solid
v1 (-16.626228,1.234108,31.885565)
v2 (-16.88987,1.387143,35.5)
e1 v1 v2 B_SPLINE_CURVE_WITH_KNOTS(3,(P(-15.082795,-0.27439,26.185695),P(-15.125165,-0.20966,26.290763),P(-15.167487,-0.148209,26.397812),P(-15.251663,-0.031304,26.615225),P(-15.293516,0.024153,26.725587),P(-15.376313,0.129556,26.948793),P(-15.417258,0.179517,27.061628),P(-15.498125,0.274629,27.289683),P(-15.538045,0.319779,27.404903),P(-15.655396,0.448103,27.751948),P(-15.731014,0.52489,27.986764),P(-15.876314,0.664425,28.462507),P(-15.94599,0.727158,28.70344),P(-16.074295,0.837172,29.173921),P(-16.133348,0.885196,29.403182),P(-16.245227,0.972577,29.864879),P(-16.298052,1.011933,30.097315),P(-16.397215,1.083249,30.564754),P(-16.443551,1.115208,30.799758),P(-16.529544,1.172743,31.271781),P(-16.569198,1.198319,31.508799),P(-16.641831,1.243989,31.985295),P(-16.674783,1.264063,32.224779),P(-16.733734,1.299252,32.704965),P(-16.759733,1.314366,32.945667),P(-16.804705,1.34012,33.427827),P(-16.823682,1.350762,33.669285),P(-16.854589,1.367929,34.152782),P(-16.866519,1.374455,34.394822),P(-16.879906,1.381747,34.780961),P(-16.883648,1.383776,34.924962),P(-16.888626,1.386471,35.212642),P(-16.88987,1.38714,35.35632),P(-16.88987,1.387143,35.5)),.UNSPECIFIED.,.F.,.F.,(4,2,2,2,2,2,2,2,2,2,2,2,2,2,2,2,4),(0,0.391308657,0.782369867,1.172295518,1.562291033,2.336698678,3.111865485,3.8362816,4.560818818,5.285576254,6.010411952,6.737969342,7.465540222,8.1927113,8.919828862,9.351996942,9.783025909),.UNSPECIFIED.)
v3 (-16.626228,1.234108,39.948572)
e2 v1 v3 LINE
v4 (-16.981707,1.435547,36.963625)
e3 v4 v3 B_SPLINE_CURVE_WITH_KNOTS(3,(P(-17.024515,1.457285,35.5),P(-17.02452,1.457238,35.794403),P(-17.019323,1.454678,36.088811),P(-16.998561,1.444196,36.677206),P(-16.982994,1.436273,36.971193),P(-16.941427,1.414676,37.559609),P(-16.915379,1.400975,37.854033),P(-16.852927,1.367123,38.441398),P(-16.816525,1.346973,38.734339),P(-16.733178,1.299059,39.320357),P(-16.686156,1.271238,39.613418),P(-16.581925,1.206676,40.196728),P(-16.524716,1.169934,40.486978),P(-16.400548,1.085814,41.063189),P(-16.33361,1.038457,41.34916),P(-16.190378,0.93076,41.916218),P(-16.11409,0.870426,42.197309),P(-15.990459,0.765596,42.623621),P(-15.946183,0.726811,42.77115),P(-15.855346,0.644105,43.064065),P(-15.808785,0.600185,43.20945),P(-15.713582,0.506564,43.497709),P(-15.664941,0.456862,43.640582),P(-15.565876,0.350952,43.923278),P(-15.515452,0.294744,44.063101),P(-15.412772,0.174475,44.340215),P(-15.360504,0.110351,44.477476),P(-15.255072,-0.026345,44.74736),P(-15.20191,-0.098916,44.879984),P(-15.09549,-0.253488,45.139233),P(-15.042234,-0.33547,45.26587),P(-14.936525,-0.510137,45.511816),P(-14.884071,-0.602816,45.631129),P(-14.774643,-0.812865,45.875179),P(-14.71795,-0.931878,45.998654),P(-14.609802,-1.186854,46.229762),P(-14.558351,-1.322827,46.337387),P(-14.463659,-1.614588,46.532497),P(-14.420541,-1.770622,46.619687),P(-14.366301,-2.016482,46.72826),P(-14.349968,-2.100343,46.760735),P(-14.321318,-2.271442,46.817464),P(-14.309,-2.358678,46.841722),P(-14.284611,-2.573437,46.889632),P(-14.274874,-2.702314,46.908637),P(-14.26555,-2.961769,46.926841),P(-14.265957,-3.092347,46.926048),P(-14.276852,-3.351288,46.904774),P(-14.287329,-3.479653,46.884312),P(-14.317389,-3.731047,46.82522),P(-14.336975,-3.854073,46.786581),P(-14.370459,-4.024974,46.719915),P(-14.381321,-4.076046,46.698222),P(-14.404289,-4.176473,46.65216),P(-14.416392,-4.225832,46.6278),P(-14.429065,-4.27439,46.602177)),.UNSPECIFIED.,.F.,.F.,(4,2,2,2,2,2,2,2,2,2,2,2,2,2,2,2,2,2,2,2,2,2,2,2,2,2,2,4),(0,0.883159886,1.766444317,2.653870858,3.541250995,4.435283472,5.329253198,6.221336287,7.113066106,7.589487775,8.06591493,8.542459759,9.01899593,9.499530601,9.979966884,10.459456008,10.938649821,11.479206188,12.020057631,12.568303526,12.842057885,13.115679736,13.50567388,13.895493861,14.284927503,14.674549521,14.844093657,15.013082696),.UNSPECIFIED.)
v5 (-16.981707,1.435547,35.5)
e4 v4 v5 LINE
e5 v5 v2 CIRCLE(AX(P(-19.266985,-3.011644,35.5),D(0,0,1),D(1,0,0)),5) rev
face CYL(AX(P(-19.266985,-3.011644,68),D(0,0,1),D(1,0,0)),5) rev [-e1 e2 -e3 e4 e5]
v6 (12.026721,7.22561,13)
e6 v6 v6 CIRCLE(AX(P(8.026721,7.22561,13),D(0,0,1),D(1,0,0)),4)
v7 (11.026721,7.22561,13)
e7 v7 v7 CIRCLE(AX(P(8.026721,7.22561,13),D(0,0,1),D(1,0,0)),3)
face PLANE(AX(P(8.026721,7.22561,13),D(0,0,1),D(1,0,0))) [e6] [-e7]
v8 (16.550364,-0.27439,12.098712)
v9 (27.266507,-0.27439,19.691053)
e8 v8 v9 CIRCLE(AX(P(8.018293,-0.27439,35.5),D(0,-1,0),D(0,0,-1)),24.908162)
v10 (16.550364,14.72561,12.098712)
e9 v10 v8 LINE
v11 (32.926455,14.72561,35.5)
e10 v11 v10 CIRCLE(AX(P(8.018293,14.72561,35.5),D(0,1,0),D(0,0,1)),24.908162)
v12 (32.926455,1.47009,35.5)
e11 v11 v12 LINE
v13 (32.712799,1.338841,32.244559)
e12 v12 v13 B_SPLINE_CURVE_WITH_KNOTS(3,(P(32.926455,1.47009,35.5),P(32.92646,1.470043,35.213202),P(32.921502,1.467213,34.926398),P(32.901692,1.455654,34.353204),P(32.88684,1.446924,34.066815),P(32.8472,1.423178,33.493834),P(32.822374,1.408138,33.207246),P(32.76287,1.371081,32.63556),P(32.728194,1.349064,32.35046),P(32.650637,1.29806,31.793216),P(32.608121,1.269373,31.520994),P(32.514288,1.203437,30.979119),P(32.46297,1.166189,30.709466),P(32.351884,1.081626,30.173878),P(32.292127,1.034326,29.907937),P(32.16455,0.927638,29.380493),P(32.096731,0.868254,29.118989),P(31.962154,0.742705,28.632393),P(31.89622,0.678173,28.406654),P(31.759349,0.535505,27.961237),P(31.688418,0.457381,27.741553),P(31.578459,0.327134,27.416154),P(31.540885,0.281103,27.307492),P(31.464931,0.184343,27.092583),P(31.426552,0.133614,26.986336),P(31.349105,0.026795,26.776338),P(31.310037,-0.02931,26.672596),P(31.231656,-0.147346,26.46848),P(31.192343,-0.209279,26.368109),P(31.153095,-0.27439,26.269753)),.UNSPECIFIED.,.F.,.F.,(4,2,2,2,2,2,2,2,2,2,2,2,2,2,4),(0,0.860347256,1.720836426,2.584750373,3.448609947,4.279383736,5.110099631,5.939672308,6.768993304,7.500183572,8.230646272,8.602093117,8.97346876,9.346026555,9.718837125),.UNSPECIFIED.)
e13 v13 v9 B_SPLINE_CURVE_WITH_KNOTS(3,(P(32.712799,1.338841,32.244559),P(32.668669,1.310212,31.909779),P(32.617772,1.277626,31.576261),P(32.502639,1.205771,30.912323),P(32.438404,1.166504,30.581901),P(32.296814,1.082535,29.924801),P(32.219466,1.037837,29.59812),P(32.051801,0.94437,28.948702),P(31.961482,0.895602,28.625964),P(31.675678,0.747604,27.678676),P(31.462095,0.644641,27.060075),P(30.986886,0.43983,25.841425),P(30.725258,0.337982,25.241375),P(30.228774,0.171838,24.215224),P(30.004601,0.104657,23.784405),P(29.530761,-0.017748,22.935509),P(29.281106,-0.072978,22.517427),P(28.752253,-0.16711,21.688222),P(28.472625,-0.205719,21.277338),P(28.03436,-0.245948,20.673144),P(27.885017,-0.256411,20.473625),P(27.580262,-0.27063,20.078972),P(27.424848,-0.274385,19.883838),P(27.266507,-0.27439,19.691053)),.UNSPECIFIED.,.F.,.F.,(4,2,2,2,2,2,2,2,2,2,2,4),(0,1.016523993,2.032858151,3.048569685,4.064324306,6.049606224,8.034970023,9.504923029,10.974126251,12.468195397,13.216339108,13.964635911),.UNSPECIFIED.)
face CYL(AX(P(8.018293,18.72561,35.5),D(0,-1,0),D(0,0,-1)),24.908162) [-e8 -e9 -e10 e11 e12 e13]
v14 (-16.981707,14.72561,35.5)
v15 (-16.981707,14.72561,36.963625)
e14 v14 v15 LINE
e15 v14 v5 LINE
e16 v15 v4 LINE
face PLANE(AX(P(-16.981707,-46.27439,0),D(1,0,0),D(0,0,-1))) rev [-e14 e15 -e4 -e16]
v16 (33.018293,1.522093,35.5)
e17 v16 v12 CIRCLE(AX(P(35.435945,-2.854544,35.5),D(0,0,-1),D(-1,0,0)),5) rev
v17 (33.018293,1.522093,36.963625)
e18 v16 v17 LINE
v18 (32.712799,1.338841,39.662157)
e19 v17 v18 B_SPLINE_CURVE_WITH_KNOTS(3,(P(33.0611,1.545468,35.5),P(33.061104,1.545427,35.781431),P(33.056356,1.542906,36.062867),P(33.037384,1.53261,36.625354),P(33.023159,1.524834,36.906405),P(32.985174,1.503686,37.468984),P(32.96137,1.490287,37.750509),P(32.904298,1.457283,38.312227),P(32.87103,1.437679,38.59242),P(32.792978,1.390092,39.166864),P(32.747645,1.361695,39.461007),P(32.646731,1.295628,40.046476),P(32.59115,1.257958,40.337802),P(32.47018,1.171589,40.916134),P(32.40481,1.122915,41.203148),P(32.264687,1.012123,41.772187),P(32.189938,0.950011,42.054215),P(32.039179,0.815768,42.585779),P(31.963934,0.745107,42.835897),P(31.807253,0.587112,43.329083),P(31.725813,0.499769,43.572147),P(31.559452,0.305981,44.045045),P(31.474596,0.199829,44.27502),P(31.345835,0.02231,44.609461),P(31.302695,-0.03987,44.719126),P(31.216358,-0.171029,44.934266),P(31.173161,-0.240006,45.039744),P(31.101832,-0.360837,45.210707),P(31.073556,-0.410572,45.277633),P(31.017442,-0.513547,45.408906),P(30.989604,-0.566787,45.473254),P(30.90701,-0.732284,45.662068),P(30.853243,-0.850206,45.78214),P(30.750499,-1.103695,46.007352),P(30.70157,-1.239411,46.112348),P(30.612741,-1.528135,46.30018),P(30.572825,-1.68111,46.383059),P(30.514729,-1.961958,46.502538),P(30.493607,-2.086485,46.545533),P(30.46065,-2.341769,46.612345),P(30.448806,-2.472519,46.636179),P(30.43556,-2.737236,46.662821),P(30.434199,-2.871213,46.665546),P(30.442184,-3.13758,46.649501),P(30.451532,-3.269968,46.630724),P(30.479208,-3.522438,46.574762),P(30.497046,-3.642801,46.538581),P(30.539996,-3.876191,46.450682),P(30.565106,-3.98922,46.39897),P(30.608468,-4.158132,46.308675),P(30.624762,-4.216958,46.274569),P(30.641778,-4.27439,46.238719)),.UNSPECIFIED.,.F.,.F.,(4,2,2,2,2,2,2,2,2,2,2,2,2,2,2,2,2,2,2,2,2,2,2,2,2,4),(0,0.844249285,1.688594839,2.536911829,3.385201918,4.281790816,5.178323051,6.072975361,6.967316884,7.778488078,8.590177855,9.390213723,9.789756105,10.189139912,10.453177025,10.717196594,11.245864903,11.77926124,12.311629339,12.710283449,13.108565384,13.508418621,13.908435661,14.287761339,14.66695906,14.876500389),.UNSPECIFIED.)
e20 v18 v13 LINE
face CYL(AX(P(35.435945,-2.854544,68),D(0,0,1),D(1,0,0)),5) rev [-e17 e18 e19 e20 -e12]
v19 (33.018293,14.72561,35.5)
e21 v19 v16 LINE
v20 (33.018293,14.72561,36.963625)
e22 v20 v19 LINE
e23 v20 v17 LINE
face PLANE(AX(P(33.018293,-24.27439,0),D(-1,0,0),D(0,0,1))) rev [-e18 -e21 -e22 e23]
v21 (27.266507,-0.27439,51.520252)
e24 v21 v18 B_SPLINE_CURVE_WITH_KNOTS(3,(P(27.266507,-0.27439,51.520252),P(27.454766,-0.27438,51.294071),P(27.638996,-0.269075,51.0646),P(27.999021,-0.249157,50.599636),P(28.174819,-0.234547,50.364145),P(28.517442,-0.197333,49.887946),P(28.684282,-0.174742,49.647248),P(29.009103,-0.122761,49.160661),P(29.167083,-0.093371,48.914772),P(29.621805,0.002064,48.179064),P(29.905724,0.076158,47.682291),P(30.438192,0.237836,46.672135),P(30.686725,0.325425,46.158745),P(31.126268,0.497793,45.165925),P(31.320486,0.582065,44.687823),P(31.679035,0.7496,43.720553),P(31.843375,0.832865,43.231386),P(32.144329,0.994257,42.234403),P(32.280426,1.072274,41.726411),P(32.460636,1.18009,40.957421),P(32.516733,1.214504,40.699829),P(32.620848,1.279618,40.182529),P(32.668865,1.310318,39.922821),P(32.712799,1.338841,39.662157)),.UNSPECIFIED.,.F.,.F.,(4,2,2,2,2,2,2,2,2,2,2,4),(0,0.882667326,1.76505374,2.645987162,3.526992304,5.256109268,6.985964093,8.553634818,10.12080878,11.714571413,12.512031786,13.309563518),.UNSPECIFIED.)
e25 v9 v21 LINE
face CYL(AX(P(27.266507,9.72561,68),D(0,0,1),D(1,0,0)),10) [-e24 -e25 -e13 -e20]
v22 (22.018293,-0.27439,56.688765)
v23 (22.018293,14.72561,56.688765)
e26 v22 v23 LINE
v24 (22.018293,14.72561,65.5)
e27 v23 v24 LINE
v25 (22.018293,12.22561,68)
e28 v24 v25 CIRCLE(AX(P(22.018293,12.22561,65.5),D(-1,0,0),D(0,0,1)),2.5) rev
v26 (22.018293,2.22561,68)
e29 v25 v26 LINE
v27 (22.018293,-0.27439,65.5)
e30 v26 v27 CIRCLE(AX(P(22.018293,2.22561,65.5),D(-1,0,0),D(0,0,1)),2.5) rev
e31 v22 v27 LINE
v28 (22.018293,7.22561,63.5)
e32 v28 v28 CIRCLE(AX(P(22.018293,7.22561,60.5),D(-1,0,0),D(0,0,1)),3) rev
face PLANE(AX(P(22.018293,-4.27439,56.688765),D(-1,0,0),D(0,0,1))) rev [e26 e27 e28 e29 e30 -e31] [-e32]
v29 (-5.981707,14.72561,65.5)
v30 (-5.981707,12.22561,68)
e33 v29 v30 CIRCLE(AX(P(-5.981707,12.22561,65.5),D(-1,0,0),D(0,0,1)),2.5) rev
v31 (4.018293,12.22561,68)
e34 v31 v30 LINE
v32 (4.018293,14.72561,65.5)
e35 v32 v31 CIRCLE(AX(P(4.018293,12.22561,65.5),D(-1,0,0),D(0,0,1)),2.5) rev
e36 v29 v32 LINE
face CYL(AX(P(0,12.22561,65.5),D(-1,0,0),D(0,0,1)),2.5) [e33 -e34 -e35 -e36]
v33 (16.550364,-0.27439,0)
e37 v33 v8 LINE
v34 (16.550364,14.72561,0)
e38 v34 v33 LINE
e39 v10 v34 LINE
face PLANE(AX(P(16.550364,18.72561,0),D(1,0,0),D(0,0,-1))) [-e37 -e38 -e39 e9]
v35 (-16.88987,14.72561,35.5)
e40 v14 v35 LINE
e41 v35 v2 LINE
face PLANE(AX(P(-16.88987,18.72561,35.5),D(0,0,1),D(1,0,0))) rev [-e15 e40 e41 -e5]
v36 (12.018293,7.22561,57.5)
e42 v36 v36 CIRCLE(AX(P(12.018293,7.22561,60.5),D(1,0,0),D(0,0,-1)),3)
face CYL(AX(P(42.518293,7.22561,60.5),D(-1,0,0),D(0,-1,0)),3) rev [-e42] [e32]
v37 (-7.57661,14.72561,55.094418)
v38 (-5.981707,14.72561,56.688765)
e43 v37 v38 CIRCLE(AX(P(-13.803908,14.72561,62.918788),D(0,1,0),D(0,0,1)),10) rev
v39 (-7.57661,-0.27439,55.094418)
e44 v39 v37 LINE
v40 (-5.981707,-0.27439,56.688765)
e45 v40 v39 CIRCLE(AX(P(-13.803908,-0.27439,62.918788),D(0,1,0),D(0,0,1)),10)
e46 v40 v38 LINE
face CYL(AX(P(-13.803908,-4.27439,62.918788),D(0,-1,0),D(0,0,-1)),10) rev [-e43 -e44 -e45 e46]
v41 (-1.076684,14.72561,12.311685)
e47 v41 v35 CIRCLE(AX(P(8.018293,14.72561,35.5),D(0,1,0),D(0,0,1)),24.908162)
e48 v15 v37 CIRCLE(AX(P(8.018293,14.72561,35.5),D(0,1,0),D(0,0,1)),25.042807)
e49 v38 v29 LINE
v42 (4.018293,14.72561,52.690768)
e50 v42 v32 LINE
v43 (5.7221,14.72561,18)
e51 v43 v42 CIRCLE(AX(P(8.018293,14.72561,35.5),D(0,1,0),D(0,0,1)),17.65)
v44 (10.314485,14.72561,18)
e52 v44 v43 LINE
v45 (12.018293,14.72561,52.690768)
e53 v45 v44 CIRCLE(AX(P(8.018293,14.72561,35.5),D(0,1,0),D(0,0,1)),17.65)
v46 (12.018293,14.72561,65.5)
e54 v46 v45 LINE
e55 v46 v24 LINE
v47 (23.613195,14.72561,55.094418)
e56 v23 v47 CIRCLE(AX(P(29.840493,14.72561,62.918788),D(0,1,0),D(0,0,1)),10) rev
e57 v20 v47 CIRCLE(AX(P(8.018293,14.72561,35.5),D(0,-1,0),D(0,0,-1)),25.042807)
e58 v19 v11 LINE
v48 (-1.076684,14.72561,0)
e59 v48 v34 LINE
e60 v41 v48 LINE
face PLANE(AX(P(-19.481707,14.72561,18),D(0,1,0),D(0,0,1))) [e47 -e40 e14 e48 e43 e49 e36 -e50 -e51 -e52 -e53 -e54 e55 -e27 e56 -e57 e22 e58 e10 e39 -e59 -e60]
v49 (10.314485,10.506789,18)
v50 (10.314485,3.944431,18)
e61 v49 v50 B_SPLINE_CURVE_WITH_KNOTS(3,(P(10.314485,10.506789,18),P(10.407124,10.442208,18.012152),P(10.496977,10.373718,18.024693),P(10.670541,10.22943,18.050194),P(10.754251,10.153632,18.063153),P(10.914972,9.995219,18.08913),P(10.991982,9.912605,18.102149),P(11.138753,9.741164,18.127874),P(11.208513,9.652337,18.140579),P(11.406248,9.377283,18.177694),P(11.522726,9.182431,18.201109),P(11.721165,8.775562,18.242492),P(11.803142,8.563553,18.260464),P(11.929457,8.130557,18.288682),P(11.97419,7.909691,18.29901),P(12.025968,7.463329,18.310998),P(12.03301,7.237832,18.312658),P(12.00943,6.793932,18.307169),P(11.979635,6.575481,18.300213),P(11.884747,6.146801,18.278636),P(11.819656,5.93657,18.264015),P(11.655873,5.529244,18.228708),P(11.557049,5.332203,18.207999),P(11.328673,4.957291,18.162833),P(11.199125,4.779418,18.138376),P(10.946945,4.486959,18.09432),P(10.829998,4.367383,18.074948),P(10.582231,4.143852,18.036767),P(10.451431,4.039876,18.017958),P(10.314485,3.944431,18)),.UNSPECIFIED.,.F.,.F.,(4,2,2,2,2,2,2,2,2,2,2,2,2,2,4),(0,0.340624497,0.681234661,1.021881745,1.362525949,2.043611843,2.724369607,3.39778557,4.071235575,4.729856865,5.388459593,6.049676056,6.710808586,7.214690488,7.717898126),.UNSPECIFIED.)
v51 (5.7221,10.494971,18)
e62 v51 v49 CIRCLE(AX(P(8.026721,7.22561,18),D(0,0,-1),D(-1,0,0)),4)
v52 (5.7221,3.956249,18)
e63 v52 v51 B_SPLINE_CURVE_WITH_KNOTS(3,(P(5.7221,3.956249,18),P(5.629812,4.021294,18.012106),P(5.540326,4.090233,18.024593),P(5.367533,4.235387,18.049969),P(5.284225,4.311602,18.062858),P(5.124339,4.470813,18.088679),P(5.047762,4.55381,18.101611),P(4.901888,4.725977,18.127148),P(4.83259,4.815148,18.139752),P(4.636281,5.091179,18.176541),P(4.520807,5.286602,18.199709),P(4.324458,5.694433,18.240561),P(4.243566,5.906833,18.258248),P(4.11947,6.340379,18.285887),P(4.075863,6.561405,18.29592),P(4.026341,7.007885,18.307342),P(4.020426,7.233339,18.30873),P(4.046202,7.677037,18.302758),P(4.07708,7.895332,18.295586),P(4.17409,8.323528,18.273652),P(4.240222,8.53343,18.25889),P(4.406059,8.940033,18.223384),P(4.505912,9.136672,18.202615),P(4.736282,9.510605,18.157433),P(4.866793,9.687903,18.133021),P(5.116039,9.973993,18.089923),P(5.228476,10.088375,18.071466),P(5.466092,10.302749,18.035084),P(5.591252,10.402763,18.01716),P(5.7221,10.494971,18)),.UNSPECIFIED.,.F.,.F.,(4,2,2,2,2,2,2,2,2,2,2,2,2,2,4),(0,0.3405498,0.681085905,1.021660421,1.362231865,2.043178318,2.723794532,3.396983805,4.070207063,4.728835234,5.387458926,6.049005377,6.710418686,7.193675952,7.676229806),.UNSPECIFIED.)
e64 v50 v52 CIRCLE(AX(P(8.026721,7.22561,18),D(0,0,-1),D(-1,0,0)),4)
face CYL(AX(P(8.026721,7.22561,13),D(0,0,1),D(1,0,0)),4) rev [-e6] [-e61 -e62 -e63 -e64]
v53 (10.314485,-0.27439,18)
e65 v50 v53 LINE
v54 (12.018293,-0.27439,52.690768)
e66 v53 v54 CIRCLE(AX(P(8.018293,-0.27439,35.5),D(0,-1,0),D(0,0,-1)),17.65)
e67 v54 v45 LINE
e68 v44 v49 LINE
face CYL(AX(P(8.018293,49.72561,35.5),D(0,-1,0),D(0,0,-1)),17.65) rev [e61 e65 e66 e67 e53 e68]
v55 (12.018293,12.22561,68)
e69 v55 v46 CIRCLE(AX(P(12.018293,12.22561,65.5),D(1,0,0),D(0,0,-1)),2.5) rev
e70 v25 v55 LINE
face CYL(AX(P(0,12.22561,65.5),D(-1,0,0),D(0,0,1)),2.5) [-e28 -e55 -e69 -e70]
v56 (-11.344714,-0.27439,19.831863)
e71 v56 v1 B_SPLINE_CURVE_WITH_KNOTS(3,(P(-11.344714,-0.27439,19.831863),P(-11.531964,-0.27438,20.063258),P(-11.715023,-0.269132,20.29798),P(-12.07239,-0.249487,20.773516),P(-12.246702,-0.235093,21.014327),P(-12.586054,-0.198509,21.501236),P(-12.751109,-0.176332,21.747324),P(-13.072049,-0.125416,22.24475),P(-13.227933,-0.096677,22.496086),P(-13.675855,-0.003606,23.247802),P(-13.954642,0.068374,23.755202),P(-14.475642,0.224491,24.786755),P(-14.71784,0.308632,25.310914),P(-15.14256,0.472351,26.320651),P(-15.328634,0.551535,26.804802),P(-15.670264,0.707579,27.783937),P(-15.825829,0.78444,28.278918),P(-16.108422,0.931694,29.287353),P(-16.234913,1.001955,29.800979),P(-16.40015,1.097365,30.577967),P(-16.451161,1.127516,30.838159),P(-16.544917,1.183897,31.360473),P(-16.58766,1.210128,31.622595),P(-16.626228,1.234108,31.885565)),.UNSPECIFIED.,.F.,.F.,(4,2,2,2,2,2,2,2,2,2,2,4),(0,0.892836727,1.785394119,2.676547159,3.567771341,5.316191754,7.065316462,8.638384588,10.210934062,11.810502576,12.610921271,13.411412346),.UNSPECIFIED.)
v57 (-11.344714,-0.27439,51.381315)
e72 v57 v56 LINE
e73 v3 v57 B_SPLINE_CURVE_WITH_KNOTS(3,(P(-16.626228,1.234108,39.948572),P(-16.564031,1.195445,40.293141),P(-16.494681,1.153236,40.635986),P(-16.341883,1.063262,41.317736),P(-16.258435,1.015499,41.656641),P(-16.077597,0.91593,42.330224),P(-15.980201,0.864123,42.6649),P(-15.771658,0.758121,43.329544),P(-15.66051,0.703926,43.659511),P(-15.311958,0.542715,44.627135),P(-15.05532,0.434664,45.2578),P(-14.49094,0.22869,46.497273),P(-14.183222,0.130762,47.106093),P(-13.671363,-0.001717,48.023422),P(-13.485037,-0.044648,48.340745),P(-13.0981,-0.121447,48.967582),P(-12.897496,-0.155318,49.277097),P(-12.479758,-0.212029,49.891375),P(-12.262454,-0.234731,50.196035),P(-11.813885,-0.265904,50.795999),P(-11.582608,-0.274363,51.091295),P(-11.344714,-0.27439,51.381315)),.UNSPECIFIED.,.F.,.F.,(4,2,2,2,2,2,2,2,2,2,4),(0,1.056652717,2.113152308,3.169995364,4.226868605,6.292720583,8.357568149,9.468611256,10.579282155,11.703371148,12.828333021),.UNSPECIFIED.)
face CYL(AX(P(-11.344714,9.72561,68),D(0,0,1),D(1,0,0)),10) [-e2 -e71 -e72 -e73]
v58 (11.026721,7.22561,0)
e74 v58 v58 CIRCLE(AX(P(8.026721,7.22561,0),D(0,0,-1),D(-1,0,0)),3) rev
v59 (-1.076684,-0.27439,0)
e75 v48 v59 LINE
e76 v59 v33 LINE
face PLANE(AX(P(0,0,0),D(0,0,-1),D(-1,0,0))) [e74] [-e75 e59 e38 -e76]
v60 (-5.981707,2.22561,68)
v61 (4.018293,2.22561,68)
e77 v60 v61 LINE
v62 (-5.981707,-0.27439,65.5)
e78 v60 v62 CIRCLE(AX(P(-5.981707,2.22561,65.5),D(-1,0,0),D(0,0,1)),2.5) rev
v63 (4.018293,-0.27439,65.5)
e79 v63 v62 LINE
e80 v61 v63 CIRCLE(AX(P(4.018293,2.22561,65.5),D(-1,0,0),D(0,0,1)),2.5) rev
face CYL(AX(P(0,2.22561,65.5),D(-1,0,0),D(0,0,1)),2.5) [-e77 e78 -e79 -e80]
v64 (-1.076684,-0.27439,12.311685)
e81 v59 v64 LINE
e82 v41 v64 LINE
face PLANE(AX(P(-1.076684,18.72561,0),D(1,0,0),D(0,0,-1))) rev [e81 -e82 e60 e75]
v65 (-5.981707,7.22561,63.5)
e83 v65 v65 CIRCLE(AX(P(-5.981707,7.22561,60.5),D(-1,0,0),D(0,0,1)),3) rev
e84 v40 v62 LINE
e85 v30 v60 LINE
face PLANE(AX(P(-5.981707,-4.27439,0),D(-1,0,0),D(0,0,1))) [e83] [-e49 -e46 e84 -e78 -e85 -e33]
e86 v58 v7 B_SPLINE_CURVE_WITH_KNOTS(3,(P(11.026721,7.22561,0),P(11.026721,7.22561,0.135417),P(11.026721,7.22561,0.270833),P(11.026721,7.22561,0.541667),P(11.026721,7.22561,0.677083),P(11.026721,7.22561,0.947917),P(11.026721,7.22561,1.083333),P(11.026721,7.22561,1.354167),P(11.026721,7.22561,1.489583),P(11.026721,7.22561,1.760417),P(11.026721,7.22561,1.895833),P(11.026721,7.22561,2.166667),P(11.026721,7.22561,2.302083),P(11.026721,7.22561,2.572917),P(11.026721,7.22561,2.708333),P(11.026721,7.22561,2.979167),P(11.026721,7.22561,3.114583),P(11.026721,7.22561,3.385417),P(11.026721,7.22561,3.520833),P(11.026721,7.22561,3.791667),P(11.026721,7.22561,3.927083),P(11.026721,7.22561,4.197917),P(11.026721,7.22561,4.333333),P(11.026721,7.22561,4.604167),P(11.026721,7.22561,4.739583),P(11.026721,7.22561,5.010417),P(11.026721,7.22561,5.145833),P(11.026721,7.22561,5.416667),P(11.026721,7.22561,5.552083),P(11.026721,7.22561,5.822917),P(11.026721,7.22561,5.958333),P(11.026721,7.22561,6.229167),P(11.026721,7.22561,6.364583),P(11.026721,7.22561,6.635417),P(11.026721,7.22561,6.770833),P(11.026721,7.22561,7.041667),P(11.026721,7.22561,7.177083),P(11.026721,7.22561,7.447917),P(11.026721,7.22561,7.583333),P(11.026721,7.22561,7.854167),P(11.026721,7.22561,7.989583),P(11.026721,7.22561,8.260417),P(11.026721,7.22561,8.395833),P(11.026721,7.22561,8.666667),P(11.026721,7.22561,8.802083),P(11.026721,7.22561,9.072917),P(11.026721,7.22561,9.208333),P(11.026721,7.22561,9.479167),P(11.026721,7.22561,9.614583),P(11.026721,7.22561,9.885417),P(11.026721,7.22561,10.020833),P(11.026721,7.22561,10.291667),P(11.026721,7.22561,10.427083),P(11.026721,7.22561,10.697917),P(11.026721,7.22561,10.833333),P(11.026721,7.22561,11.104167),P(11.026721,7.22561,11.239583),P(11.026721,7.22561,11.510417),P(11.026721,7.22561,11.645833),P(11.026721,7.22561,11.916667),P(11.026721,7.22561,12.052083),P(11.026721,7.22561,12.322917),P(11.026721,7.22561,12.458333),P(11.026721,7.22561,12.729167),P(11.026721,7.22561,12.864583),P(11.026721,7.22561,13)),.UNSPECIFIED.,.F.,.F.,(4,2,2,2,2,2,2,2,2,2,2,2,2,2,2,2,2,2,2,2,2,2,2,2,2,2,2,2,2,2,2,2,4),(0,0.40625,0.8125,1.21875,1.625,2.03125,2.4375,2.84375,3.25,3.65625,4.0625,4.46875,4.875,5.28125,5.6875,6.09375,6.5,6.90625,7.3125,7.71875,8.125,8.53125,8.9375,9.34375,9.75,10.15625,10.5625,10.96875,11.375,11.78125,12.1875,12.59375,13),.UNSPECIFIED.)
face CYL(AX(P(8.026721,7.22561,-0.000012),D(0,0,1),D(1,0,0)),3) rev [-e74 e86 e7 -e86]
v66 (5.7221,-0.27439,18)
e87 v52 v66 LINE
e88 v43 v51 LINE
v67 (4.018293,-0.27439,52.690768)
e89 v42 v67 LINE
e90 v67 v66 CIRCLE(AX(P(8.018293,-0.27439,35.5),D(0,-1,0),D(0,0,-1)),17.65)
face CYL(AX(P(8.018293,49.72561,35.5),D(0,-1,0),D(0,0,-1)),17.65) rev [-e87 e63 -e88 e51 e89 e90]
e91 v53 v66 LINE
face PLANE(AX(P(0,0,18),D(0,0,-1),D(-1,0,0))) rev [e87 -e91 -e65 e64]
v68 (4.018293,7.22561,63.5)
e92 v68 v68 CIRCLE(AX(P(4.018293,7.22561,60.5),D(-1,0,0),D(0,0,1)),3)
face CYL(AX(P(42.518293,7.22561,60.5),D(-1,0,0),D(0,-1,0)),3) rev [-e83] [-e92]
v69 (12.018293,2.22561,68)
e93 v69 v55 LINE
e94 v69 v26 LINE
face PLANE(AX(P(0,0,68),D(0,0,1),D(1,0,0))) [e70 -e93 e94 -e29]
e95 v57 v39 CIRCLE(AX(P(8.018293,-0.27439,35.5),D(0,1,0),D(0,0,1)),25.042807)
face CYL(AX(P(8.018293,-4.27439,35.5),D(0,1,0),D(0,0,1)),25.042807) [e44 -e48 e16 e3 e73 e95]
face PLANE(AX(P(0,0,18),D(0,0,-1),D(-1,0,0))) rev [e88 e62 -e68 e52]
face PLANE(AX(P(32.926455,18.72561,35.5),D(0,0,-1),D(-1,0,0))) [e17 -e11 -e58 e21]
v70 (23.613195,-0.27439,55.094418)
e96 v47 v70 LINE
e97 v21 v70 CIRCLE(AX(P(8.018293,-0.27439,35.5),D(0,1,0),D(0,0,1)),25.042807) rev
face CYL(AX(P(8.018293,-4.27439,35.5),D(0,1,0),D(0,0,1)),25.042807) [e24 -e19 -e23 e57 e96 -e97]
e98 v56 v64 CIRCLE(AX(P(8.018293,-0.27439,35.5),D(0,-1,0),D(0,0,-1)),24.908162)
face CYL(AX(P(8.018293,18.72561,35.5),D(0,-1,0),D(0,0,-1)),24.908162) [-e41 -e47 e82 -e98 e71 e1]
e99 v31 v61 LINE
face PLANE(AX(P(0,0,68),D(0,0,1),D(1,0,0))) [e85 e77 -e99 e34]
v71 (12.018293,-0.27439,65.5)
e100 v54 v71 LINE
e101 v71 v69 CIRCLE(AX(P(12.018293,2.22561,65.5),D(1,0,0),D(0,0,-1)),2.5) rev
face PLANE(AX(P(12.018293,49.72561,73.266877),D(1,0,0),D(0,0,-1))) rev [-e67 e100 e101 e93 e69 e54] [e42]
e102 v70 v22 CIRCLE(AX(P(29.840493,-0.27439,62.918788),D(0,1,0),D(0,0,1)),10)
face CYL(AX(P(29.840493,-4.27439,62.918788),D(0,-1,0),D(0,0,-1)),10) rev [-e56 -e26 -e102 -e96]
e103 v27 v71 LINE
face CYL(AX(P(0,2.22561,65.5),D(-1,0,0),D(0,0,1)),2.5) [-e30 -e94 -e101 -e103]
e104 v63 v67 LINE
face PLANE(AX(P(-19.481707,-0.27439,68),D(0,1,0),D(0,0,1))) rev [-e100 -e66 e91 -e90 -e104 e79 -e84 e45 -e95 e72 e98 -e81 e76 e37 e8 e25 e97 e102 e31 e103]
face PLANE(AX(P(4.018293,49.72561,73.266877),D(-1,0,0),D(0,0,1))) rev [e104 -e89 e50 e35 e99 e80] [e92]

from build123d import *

# Parameters (mm, degrees)
SKETCH1_W                = 55
SKETCH1_H                = 40
BOSS_EXTRUDE1_DEPTH      = 18
SKETCH2_W                = 55
SKETCH2_H                = 15
BOSS_EXTRUDE2_DEPTH      = 50
CUT_EXTRUDE1_START       = -15
CUT_EXTRUDE1_DEPTH       = 15
SKETCH4_W                = 8
SKETCH4_H                = 40.233753348
CUT_EXTRUDE2_DEPTH       = 50
SKETCH6_R                = 3
CUT_EXTRUDE3_DEPTH       = 62
FILLET1_R                = 2.5
CUT_EXTRUDE6_DEPTH       = 67.335088131
CUT_EXTRUDE6_DEPTH_BACK  = 67.335088131
CUT_EXTRUDE7_DEPTH       = 61
CUT_EXTRUDE8_DEPTH       = 39
FILLET2_R                = 20
CUT_EXTRUDE9_DEPTH       = 80.705724129
CUT_EXTRUDE9_DEPTH_BACK  = 80.705724129
FILLET4_DEPTH            = 68
FILLET4_2_DEPTH          = 18
FILLET4_START            = -18
FILLET4_3_DEPTH          = 52
CUT_EXTRUDE12_DEPTH      = 19
SKETCH16_W               = 51.141958407
SKETCH16_H               = 24.204184136
CUT_EXTRUDE13_DEPTH      = 19
CUT_EXTRUDE14_DEPTH      = 78.013318614
CUT_EXTRUDE14_DEPTH_BACK = 19
SKETCH17_R               = 3
FILLET6_R                = 10
SKETCH21_R               = 4
CUT_EXTRUDE16_DEPTH      = 7
CUT_EXTRUDE17_DEPTH      = 19
CUT_EXTRUDE18_DEPTH      = 19
FILLET7_R                = 10


with BuildPart() as part:
    # Sketch1 → Boss-Extrude1 (new body)
    with BuildSketch(Plane.XY):
        with Locations((8.018292683, -5.274390244)):
            Rectangle(SKETCH1_W, SKETCH1_H)
    extrude(amount=BOSS_EXTRUDE1_DEPTH)

    # Sketch2 → Boss-Extrude2 (add)
    with BuildSketch(Plane.XY.offset(18)):
        with Locations((8.018292683, 7.225609756)):
            Rectangle(SKETCH2_W, SKETCH2_H)
    extrude(amount=BOSS_EXTRUDE2_DEPTH)

    # Cut-Extrude1: read off the stored shape, not the designer's step
    # Cut-Extrude1 outline → Cut-Extrude1 (cut)
    with BuildSketch(Plane(origin=(0, -0.274390244, 0), x_dir=(-1, 0, 0), z_dir=(0, -1, 0)).offset(CUT_EXTRUDE1_START)):
        with BuildLine():
            ThreePointArc((-10.314485184, -18), (-8.018292683, -53.15), (-5.722100182, -18))
            Line((-5.722100182, -18), (-10.314485184, -18))
        make_face()
    extrude(amount=CUT_EXTRUDE1_DEPTH, mode=Mode.SUBTRACT)

    # Sketch4 → Cut-Extrude2 (cut)
    with BuildSketch(Plane(origin=(0, -0.274390244, 0), x_dir=(-1, 0, 0), z_dir=(0, -1, 0))):
        with Locations((-8.018292683, -53.15)):
            Rectangle(SKETCH4_W, SKETCH4_H)
    extrude(amount=-CUT_EXTRUDE2_DEPTH, mode=Mode.SUBTRACT)

    # Sketch6 → Cut-Extrude3 (cut)
    with BuildSketch(Plane.ZY.offset(19.481707317)):
        with Locations(Location((60.5, 7.225609756, 0), (0, 0, 270))):
            Circle(SKETCH6_R)
    extrude(amount=-CUT_EXTRUDE3_DEPTH, mode=Mode.SUBTRACT)

    # Fillet1
    fillet1_edges = [part.edges().sort_by_distance(p)[0] for p in [
        (35.518292683, -12.774390244, 18),
        (-19.481707317, -12.774390244, 18),
        (-19.481707317, -0.274390244, 43),
        (35.518292683, -0.274390244, 43),
        (-7.731707317, -0.274390244, 68),
        (23.768292683, 14.725609756, 68),
        (8.018292683, -25.274390244, 18),
        (23.768292683, -0.274390244, 68),
        (-7.731707317, 14.725609756, 68),
        (-19.481707317, 14.725609756, 34),
        (35.518292683, 14.725609756, 34),
    ]]
    fillet(fillet1_edges, radius=FILLET1_R)

    # Sketch10 → Cut-Extrude6 (cut, two sides: drawn at the far end of the back side and taken through both)
    with BuildSketch(Plane.XY.offset(18).offset(-CUT_EXTRUDE6_DEPTH_BACK)):
        with BuildLine():
            ThreePointArc((-3.438146554, -22.774390244), (-11.4271438, -17.219826727), (-16.981707317, -9.230829481))
            Line((-16.981707317, -9.230829481), (-16.981707317, -22.774390244))
            Line((-16.981707317, -22.774390244), (-3.438146554, -22.774390244))
        make_face()
        with BuildLine():
            ThreePointArc((-16.981707317, -9.230829481), (-18.849438892, -3.637409944), (-19.481707317, 2.225609756))
            Line((-19.481707317, 2.225609756), (-19.481707317, -25.274390244))
            Line((-19.481707317, -25.274390244), (8.018292683, -25.274390244))
            ThreePointArc((8.018292683, -25.274390244), (2.155272983, -24.642121819), (-3.438146554, -22.774390244))
            Line((-3.438146554, -22.774390244), (-16.981707317, -22.774390244))
            Line((-16.981707317, -22.774390244), (-16.981707317, -9.230829481))
        make_face()
        with BuildLine():
            ThreePointArc((19.47473192, -22.774390244), (13.881312383, -24.642121819), (8.018292683, -25.274390244))
            Line((8.018292683, -25.274390244), (35.518292683, -25.274390244))
            Line((35.518292683, -25.274390244), (35.518292683, 2.225609756))
            ThreePointArc((35.518292683, 2.225609756), (34.886024258, -3.637409944), (33.018292683, -9.230829481))
            Line((33.018292683, -9.230829481), (33.018292683, -22.774390244))
            Line((33.018292683, -22.774390244), (19.47473192, -22.774390244))
        make_face()
        with BuildLine():
            ThreePointArc((33.018292683, -9.230829481), (27.463729166, -17.219826727), (19.47473192, -22.774390244))
            Line((19.47473192, -22.774390244), (33.018292683, -22.774390244))
            Line((33.018292683, -22.774390244), (33.018292683, -9.230829481))
        make_face()
    extrude(amount=CUT_EXTRUDE6_DEPTH + CUT_EXTRUDE6_DEPTH_BACK, mode=Mode.SUBTRACT)

    # Sketch11 → Cut-Extrude7 (cut)
    with BuildSketch(Plane(origin=(0, 14.725609756, 0), x_dir=(1, 0, 0), z_dir=(0, 1, 0))):
        Polygon((-16.981707317, -68), (-16.981707317, 0), (-29.965472326, 0), (-29.965472326, -73.975211298), (-16.981707317, -73.975211298), align=None)
    extrude(amount=-CUT_EXTRUDE7_DEPTH, mode=Mode.SUBTRACT)

    # Sketch12 → Cut-Extrude8 (cut)
    with BuildSketch(Plane(origin=(0, 14.725609756, 0), x_dir=(1, 0, 0), z_dir=(0, 1, 0))):
        Polygon((33.018292683, -34), (33.018292683, -69.603278632), (51.263623859, -69.603278632), (51.263623859, -68), (51.263623859, 5.657942166), (48.966322657, 5.657942166), (33.018292683, 5.657942166), align=None)
    extrude(amount=-CUT_EXTRUDE8_DEPTH, mode=Mode.SUBTRACT)

    # Fillet2
    fillet2_edges = [part.edges().sort_by_distance(p)[0] for p in [
        (-16.981707317, -9.230829481, 9),
        (33.018292683, -9.230829481, 9),
    ]]
    fillet(fillet2_edges, radius=FILLET2_R)

    # Sketch13 → Cut-Extrude9 (cut, two sides: drawn at the far end of the back side and taken through both)
    with BuildSketch(Plane(origin=(0, 0, 0), x_dir=(-1, 0, 0), z_dir=(0, 0, -1)).offset(-CUT_EXTRUDE9_DEPTH_BACK)):
        with BuildLine():
            Line((15.409844247, 2.637038383), (21.378631307, -1.925347001))
            Line((21.378631307, -1.925347001), (18.152736662, -25.695120221))
            Line((18.152736662, -25.695120221), (-4.693551269, -34.090790667))
            Line((-4.693551269, -34.090790667), (-38.816552793, -29.459816409))
            Line((-38.816552793, -29.459816409), (-43.750527307, -6.539564186))
            Line((-43.750527307, -6.539564186), (-31.534000974, 2.637038383))
            ThreePointArc((-31.534000974, 2.637038383), (-29.812131381, -4.006457809), (-26.853089861, -10.198787729))
            ThreePointArc((-26.853089861, -10.198787729), (-8.062078363, -22.773516814), (10.728933135, -10.198787729))
            ThreePointArc((10.728933135, -10.198787729), (13.687974655, -4.006457809), (15.409844247, 2.637038383))
        make_face()
    extrude(amount=CUT_EXTRUDE9_DEPTH + CUT_EXTRUDE9_DEPTH_BACK, mode=Mode.SUBTRACT)

    # Fillet4: read off the stored shape, not the designer's step
    # Fillet4 outline → Fillet4 (add)
    with BuildSketch(Plane.XY):
        with BuildLine():
            ThreePointArc((31.153095191, -0.274390244), (31.967368862, 0.746702465), (33.018292683, 1.52209337))
            Line((33.018292683, 1.52209337), (31.534000974, 2.637038383))
            ThreePointArc((31.534000974, 2.637038383), (31.270593615, 1.175225559), (30.946719887, -0.274390244))
            Line((30.946719887, -0.274390244), (31.153095191, -0.274390244))
        make_face()
        with BuildLine():
            ThreePointArc((-16.981707317, 1.435547188), (-15.921170685, 0.70393524), (-15.08279533, -0.274390244))
            Line((-15.08279533, -0.274390244), (-14.82256316, -0.274390244))
            ThreePointArc((-14.82256316, -0.274390244), (-15.146436888, 1.175225559), (-15.409844247, 2.637038383))
            Line((-15.409844247, 2.637038383), (-16.981707317, 1.435547188))
        make_face()
    extrude(amount=FILLET4_DEPTH)

    # Fillet4 2 outline → Fillet4 2 (add)
    with BuildSketch(Plane.XY):
        with BuildLine():
            ThreePointArc((30.624925491, -1.492895434), (30.848374458, -0.866028928), (31.153095191, -0.274390244))
            Line((31.153095191, -0.274390244), (30.946719887, -0.274390244))
            ThreePointArc((30.946719887, -0.274390244), (30.791189941, -0.885060274), (30.624925491, -1.492895434))
        make_face()
        with BuildLine():
            ThreePointArc((-15.08279533, -0.274390244), (-14.721255817, -0.92925432), (-14.461460233, -1.63072708))
            ThreePointArc((-14.461460233, -1.63072708), (-14.648665519, -0.954330135), (-14.82256316, -0.274390244))
            Line((-14.82256316, -0.274390244), (-15.08279533, -0.274390244))
        make_face()
    extrude(amount=FILLET4_2_DEPTH)

    # Fillet4 3 outline → Fillet4 3 (cut)
    with BuildSketch(Plane.YZ.offset(FILLET4_START)):
        with BuildLine():
            Line((-0.274390244, 68), (-0.274390244, 65.5))
            ThreePointArc((-0.274390244, 65.5), (0.457842803, 67.267766953), (2.225609756, 68))
            Line((2.225609756, 68), (-0.274390244, 68))
        make_face()
    extrude(amount=FILLET4_3_DEPTH, mode=Mode.SUBTRACT)

    # Sketch15 → Cut-Extrude12 (cut)
    with BuildSketch(Plane(origin=(0, 14.725609756, 0), x_dir=(1, 0, 0), z_dir=(0, 1, 0))):
        with BuildLine():
            Line((-17.024514656, -35.5), (-33.27975261, -35.5))
            Line((-33.27975261, -35.5), (-35.19687657, -60.540801199))
            Line((-35.19687657, -60.540801199), (-35.19687657, -93.839402474))
            Line((-35.19687657, -93.839402474), (-5.981707317, -96.076116088))
            Line((-5.981707317, -96.076116088), (-5.981707317, -56.688765002))
            Line((-5.981707317, -56.688765002), (-5.330056918, -56.688765002))
            ThreePointArc((-5.330056918, -56.688765002), (-13.906833847, -47.600868813), (-17.024514656, -35.5))
        make_face()
        with BuildLine():
            Line((22.018292683, -56.688765002), (22.018292683, -96.076116088))
            Line((22.018292683, -96.076116088), (51.233461936, -93.839402474))
            Line((51.233461936, -93.839402474), (51.233461936, -60.540801199))
            Line((51.233461936, -60.540801199), (49.316337976, -35.5))
            Line((49.316337976, -35.5), (33.061100022, -35.5))
            ThreePointArc((33.061100022, -35.5), (29.943419213, -47.600868813), (21.366642284, -56.688765002))
            Line((21.366642284, -56.688765002), (22.018292683, -56.688765002))
        make_face()
    extrude(amount=-CUT_EXTRUDE12_DEPTH, mode=Mode.SUBTRACT)

    # Sketch16 → Cut-Extrude13 (cut)
    with BuildSketch(Plane.XY.offset(18)):
        with Locations((10.488183873, -12.376482312)):
            Rectangle(SKETCH16_W, SKETCH16_H)
    extrude(amount=-CUT_EXTRUDE13_DEPTH, mode=Mode.SUBTRACT)

    # Sketch17 → Cut-Extrude14 (cut, two sides: drawn at the far end of the back side and taken through both)
    with BuildSketch(Plane(origin=(0, 0, 0), x_dir=(-1, 0, 0), z_dir=(0, 0, -1)).offset(-CUT_EXTRUDE14_DEPTH_BACK)):
        with Locations(Location((-8.026721307, 7.225609756, 0), (0, 0, 220.307119111))):
            Circle(SKETCH17_R)
    extrude(amount=CUT_EXTRUDE14_DEPTH + CUT_EXTRUDE14_DEPTH_BACK, mode=Mode.SUBTRACT)

    # Fillet6
    # the kernel refuses this fillet: 10 mm, written as the material it adds along each edge
    with BuildSketch(Plane(origin=(21.366642284, 14.725609756, 56.688765002), x_dir=(0.8155038635718538, 0, -0.5787516293708203), z_dir=(0, -1, 0))) as fillet6_piece_1:
        with BuildLine():
            CenterArc((3.30482204, 9.984862506), FILLET6_R, 253.898496667, 12.94853639)
            Line((0.531423418, 0.37714373), (0, 0))
            ThreePointArc((0, 0), (1.377401598, 0.037908534), (2.754803195, 0))
        make_face()
    extrude(amount=15)
    with BuildSketch(Plane(origin=(-5.330056918, 14.725609756, 56.688765002), x_dir=(-0.8155038635718542, 0, -0.5787516293708195), z_dir=(0, -1, 0))) as fillet6_piece_2:
        with BuildLine():
            CenterArc((3.30482204, -9.984862506), FILLET6_R, 93.152966943, 12.94853639)
            Line((0.531423418, -0.37714373), (0, 0))
            ThreePointArc((0, 0), (1.377401598, -0.037908534), (2.754803195, 0))
        make_face()
    extrude(amount=15)

    # Sketch21 → Cut-Extrude16 (cut)
    with BuildSketch(Plane.XY.offset(20)):
        with Locations((8.026721307, 7.225609756)):
            Circle(SKETCH21_R)
    extrude(amount=-CUT_EXTRUDE16_DEPTH, mode=Mode.SUBTRACT)

    # Sketch22 → Cut-Extrude17 (cut)
    with BuildSketch(Plane(origin=(0, -0.274390244, 0), x_dir=(-1, 0, 0), z_dir=(0, -1, 0))):
        Polygon((-16.550364213, 0), (1.076683558, 0), (1.076683558, -7), (21.110231161, -7), (21.110231161, 7.483175263), (-36.583911817, 7.483175263), (-36.583911817, -7), (-16.550364213, -7), align=None)
    extrude(amount=-CUT_EXTRUDE17_DEPTH, mode=Mode.SUBTRACT)

    # Sketch23 → Cut-Extrude18 (cut)
    with BuildSketch(Plane.XZ.offset(0.274390244)):
        with BuildLine():
            Line((-1.076683558, 7), (-1.076683558, 12.311685022))
            ThreePointArc((-1.076683558, 12.311685022), (-12.560284622, 21.466515028), (-16.88986952, 35.5))
            Line((-16.88986952, 35.5), (-40.344642409, 35.5))
            Line((-40.344642409, 35.5), (-40.344642409, 5.039728318))
            Line((-40.344642409, 5.039728318), (-1.076683558, 7))
        make_face()
        with BuildLine():
            Line((16.550364213, 7), (16.550364213, 12.09871158))
            ThreePointArc((16.550364213, 12.09871158), (28.425825188, 21.218922962), (32.926454886, 35.5))
            Line((32.926454886, 35.5), (56.524951208, 35.5))
            Line((56.524951208, 35.5), (55.518887179, 6.019864159))
            Line((55.518887179, 6.019864159), (16.550364213, 7))
        make_face()
    extrude(amount=-CUT_EXTRUDE18_DEPTH, mode=Mode.SUBTRACT)

    # Fillet7
    fillet7_edges = [part.edges().sort_by_distance(p)[0] for p in [
        (31.153095191, -0.274390244, 35.678703647),
        (-15.08279533, -0.274390244, 35.677150261),
    ]]
    fillet(fillet7_edges, radius=FILLET7_R)


solid = part.part
